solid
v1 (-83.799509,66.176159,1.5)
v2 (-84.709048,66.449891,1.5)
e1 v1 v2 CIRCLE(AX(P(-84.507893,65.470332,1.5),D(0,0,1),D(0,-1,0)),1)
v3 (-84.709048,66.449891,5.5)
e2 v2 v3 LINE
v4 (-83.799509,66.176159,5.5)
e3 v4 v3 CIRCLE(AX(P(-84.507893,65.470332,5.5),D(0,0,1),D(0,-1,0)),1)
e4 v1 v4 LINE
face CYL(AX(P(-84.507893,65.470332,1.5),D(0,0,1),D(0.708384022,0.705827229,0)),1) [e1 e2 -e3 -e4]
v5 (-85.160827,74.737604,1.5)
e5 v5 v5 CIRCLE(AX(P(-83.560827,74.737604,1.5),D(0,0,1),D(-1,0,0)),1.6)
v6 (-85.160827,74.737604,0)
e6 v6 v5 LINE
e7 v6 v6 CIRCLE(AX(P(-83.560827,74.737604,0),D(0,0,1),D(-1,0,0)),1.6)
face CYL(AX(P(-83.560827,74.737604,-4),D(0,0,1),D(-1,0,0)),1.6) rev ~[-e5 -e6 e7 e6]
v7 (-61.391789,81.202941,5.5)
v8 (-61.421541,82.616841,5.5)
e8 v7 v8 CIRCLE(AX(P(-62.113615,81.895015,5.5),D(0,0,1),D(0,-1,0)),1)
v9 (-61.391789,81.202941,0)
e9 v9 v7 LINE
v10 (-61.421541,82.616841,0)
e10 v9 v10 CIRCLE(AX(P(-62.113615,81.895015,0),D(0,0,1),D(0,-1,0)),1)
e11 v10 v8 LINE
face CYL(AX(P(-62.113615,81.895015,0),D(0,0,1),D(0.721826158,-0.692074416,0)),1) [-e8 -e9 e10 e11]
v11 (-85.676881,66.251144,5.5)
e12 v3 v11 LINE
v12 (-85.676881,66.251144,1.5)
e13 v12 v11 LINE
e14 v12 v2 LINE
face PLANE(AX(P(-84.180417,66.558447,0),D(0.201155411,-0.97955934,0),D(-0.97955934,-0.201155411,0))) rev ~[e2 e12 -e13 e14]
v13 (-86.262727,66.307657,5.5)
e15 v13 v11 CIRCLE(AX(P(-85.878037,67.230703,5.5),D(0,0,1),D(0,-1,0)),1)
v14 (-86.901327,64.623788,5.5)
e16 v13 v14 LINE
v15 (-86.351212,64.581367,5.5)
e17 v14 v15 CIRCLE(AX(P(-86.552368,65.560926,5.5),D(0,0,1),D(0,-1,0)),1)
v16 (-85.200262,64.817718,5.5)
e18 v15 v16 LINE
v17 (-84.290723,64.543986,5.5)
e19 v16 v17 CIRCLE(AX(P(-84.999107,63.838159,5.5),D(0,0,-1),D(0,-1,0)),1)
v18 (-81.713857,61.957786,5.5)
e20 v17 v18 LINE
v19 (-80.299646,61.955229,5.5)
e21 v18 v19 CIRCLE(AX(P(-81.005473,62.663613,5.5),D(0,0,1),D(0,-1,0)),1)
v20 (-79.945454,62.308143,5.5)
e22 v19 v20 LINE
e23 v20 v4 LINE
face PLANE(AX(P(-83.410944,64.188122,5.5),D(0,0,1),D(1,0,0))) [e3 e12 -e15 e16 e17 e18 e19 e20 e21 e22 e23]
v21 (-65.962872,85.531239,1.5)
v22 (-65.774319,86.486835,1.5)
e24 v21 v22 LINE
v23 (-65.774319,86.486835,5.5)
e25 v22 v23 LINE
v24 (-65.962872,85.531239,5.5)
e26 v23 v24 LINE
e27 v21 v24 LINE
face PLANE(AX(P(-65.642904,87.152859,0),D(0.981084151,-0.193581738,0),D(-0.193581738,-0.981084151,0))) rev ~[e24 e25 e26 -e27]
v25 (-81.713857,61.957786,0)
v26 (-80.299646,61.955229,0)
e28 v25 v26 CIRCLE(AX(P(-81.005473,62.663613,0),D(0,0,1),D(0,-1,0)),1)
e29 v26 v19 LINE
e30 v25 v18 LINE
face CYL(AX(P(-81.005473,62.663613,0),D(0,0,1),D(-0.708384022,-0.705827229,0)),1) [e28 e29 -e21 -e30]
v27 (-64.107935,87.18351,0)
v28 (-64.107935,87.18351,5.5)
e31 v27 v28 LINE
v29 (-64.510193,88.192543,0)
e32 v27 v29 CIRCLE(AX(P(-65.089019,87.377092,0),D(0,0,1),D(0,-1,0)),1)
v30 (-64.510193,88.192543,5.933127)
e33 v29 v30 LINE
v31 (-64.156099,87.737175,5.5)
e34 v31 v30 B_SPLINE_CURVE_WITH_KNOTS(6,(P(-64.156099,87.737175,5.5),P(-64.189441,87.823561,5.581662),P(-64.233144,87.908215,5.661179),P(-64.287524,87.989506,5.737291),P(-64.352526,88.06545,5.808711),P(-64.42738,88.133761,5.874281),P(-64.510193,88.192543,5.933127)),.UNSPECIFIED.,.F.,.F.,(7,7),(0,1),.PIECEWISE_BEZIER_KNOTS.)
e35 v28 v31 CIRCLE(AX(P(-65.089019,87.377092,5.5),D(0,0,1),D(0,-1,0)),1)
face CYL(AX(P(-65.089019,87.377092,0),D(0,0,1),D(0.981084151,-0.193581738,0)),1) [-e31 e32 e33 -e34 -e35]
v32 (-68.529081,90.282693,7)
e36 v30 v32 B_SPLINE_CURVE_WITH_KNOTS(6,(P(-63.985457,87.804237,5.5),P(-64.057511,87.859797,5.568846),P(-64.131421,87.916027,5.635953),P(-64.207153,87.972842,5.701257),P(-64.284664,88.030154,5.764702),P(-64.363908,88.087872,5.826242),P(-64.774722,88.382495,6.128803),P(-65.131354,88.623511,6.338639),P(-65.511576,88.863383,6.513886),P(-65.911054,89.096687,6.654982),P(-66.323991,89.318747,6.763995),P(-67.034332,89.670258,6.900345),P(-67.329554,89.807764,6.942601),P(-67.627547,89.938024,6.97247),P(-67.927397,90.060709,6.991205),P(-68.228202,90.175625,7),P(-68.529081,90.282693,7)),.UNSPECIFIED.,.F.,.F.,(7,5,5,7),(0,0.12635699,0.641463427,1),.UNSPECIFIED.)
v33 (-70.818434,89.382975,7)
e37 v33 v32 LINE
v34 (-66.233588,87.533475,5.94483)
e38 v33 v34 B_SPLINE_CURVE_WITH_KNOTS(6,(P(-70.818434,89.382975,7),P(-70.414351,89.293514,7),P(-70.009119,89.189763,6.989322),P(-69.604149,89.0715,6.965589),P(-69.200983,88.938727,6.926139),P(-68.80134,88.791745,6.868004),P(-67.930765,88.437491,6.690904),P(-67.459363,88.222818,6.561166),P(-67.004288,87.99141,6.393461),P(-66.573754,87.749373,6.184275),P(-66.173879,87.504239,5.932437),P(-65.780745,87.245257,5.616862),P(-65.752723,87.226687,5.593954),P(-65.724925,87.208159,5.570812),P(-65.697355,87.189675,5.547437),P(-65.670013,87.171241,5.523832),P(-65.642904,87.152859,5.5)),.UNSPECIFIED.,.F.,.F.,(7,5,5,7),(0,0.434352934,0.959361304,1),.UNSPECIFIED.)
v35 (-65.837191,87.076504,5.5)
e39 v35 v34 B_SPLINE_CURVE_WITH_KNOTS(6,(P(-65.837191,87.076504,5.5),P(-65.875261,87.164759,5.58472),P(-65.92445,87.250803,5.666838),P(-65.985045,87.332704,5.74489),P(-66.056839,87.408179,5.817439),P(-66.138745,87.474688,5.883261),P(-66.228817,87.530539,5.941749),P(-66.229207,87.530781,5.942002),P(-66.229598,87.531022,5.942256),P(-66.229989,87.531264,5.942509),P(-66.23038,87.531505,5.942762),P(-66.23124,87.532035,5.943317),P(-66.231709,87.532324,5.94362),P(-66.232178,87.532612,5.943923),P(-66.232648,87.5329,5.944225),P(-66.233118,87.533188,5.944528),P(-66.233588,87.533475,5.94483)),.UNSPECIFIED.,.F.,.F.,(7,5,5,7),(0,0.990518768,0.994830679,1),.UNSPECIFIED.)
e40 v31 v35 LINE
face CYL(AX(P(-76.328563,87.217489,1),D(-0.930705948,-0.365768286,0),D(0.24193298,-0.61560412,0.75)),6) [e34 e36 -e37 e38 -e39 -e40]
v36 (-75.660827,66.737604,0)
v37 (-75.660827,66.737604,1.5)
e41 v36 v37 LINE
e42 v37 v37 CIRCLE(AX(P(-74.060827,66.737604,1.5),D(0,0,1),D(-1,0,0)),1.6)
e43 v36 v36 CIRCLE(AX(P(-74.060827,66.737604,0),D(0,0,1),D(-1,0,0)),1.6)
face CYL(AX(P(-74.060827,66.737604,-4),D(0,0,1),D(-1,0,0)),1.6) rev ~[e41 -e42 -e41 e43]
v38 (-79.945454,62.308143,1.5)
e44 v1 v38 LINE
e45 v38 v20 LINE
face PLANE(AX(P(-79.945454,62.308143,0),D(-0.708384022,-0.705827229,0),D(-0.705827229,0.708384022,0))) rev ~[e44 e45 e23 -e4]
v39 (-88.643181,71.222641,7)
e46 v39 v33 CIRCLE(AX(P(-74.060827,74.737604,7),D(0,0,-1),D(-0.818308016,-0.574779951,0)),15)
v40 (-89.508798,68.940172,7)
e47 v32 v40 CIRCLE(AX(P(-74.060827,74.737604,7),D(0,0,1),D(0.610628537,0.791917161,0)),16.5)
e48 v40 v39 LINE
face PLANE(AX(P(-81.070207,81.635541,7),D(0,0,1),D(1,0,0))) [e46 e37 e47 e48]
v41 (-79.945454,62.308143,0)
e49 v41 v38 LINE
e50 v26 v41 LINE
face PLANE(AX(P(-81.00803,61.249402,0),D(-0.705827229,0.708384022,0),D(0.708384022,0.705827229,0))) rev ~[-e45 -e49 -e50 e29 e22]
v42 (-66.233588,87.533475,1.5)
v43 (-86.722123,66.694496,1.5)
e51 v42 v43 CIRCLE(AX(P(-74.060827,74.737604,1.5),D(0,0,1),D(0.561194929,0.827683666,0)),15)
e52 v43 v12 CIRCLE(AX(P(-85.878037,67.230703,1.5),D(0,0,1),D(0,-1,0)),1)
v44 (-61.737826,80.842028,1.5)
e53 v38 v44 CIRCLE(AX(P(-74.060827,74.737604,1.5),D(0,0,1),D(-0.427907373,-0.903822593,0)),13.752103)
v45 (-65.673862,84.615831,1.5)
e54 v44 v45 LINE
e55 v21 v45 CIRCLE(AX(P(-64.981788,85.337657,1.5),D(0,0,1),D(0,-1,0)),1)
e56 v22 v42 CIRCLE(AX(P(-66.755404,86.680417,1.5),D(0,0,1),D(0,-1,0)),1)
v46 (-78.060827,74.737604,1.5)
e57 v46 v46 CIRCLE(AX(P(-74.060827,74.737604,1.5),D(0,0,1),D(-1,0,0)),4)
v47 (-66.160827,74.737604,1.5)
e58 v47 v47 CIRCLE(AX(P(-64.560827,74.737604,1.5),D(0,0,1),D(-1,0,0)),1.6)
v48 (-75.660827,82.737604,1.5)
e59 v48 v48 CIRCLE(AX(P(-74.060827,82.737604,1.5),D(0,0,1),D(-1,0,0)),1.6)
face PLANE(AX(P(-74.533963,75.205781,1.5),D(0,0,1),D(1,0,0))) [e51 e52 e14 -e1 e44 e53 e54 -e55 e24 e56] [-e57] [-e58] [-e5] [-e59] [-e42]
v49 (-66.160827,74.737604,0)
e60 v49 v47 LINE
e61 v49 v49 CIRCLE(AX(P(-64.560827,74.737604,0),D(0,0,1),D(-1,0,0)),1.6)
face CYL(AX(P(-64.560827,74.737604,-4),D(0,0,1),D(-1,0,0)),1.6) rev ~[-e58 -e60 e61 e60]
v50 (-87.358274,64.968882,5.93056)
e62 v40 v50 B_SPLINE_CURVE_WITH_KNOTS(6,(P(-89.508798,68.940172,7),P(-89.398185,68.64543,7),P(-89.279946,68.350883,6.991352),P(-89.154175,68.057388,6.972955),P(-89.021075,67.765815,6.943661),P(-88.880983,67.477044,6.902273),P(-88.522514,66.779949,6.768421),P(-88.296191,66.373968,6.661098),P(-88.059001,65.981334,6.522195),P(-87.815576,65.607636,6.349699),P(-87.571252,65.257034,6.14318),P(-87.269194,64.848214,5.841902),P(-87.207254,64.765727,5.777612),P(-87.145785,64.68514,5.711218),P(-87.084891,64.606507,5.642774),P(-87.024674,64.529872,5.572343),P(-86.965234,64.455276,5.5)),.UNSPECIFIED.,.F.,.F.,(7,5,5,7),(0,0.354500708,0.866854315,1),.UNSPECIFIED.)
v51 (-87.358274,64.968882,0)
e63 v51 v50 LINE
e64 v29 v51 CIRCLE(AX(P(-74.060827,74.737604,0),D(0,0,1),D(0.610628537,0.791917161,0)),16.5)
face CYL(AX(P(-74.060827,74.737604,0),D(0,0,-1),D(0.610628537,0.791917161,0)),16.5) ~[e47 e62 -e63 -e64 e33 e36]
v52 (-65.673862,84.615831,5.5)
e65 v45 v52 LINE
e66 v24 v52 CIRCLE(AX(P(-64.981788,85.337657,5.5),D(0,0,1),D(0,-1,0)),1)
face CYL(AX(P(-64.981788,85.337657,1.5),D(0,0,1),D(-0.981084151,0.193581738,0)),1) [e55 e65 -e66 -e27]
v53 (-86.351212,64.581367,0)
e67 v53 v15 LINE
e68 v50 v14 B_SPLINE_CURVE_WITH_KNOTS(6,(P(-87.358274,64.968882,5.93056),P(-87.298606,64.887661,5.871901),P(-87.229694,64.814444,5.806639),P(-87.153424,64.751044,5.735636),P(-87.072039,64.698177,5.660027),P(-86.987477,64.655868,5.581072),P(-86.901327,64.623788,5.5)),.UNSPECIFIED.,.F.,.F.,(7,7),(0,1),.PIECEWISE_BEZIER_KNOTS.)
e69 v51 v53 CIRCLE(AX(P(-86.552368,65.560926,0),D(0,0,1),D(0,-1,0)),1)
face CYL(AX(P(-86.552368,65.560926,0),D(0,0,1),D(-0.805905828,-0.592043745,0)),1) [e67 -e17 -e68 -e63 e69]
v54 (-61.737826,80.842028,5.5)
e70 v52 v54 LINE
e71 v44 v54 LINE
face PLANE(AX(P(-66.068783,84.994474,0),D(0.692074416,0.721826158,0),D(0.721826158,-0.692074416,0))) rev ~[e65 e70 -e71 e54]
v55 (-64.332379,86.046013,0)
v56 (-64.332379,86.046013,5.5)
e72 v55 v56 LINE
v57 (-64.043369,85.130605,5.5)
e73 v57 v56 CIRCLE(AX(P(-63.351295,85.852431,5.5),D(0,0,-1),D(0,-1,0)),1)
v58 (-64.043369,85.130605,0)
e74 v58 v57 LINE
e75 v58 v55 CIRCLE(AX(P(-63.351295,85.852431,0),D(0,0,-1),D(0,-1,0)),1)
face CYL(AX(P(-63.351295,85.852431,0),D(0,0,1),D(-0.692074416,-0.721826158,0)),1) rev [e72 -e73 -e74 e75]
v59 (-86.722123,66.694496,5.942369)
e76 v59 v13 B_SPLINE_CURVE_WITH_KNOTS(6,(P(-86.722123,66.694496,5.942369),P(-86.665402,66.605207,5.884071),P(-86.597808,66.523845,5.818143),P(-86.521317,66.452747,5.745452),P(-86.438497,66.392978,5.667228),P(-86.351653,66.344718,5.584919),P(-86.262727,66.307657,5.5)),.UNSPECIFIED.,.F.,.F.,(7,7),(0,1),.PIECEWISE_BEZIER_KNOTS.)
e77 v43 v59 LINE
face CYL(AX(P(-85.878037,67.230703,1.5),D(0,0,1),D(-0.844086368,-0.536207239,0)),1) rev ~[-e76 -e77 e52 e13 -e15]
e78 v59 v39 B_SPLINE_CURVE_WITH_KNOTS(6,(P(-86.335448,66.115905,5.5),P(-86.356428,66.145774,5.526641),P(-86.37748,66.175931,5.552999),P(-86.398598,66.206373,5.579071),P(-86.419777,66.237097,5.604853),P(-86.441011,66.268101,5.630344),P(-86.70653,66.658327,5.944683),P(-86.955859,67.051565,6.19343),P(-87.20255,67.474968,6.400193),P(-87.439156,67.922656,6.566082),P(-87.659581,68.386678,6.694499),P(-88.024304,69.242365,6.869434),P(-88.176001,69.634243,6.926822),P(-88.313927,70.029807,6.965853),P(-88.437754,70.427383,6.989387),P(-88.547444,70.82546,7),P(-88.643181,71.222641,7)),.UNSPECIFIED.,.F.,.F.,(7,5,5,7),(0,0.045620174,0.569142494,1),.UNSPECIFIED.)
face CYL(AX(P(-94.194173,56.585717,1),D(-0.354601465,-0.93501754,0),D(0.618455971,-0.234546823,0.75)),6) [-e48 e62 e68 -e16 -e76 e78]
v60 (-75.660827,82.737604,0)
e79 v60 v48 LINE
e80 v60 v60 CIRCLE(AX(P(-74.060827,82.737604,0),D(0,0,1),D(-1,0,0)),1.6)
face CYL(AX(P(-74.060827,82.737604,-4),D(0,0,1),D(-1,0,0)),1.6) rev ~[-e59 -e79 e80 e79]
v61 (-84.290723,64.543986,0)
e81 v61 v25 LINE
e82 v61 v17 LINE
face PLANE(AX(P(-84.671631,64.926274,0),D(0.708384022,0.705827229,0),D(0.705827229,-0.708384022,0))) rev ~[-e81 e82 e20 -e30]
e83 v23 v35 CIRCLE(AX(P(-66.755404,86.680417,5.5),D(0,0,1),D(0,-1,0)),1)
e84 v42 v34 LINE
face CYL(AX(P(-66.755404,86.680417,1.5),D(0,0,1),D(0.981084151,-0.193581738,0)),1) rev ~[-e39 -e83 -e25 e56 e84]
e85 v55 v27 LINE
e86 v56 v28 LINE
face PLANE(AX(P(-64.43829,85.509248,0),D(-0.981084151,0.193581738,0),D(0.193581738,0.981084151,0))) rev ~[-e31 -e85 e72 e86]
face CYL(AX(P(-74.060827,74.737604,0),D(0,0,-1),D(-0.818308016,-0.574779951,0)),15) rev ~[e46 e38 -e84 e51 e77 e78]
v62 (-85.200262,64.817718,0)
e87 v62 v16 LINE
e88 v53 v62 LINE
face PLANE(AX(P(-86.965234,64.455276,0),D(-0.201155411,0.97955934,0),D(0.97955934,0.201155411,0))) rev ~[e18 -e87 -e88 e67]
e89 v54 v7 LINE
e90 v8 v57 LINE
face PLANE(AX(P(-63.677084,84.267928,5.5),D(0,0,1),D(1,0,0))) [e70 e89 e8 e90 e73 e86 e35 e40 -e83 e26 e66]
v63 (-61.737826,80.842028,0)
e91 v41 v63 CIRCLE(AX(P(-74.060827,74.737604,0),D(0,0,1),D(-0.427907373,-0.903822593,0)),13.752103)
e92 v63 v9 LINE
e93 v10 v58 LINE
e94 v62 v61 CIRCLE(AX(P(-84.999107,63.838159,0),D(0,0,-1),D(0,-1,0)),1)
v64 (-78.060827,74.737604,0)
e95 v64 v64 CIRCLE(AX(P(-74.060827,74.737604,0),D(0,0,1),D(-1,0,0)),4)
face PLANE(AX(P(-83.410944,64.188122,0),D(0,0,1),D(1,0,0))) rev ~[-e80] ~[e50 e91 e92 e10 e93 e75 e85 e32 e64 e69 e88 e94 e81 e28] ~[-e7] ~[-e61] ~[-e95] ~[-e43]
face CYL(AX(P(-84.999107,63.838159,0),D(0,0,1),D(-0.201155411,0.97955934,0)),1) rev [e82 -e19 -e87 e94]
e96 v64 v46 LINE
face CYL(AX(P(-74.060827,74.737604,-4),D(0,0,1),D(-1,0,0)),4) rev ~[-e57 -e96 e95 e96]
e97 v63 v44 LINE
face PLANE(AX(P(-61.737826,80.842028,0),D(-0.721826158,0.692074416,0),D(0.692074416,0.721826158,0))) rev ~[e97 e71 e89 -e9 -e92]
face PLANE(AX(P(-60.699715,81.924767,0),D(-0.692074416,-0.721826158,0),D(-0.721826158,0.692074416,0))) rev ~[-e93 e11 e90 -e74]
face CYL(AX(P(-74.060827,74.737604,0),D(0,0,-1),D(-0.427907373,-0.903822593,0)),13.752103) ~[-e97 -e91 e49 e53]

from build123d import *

# Parameters (mm, degrees)
F1_DEPTH    = 1.5
F2_DEPTH    = 5.5
F3_DEPTH    = 7
F4_T1_DEPTH = 21.6191756982
F4_T3_DEPTH = 21.6239840214
F5_R        = 1
F6_D        = 3.2
F6_DEPTH    = 4
F6_TIP      = 0.9613769904
F7_D        = 8
F7_DEPTH    = 4
F7_TIP      = 2.4034424761


# Not quite as in the source:
# - a fillet or chamfer that OpenCascade refuses, or shapes differently, is made with other operations: its cross-section is extruded or revolved along the edge and cut away or added


with BuildPart() as f1:
    # F0 (on Top) → F1 (new body)
    with BuildSketch(Plane.XY):
        with BuildLine():
            Line((-66.0687833834, 84.994474126), (-65.6429035596, 87.1528592574))
            ThreePointArc((-65.6429035596, 87.1528592574), (-84.7546054832, 85.2563072371), (-86.3354477268, 66.1159050004))
            Line((-86.3354477268, 66.1159050004), (-84.1804171789, 66.558446905))
            Line((-84.1804171789, 66.558446905), (-79.945453805, 62.3081427722))
            ThreePointArc((-79.945453805, 62.3081427722), (-64.2506598446, 65.1001279098), (-61.7378264361, 80.8420276277))
            Line((-61.7378264361, 80.8420276277), (-66.0687833834, 84.994474126))
        make_face()
    extrude(amount=F1_DEPTH)

    # F0 (on Top) → F2 (join)
    with BuildSketch(Plane.XY):
        Polygon((-84.1804171789, 66.558446905), (-86.3354477268, 66.1159050004), (-86.9652344199, 64.4552756389), (-84.6716307932, 64.9262739357), (-81.0080298382, 61.2494019287), (-79.945453805, 62.3081427722), align=None)
        Polygon((-63.9854566278, 87.8042374119), (-65.6429035596, 87.1528592574), (-66.0687833834, 84.994474126), (-61.7378264361, 80.8420276277), (-60.6997148116, 81.9247668645), (-64.4382903395, 85.5092483194), align=None)
    extrude(amount=F2_DEPTH)

    # F0 (on Top) → F3 (join)
    with BuildSketch(Plane.XY):
        with BuildLine():
            ThreePointArc((-86.3354477268, 66.1159050004), (-84.7546054832, 85.2563072371), (-65.6429035596, 87.1528592574))
            Line((-65.6429035596, 87.1528592574), (-63.9854566278, 87.8042374119))
            ThreePointArc((-63.9854566278, 87.8042374119), (-85.82068996, 86.3115247186), (-86.9652344199, 64.4552756389))
            Line((-86.9652344199, 64.4552756389), (-86.3354477268, 66.1159050004))
        make_face()
    extrude(amount=F3_DEPTH)

    # F4: fillet of radius 6 on 2 edges, made by hand

    # F4_s2 → F4_t1 (cut)
    with BuildSketch(Plane(origin=(6.9172981305, 18.2396174816, 0), x_dir=(0, 0, 1), z_dir=(0.3546014652, 0.9350175404, 0))):
        with BuildLine():
            ThreePointArc((5.5, -104.169954771), (6.6124860802, -106.0172613941), (7, -108.1385817376))
            Line((7, -108.1385817376), (7, -104.169954771))
            Line((7, -104.169954771), (5.5, -104.169954771))
        make_face()
    extrude(amount=F4_T1_DEPTH, mode=Mode.SUBTRACT)

    # F4_s4 → F4_t3 (cut)
    with BuildSketch(Plane(origin=(-36.4260217608, -14.315459745, 0), x_dir=(0, 0, 1), z_dir=(0.9307059478, 0.3657682856, 0))):
        with BuildLine():
            ThreePointArc((5.5, -105.123776774), (6.6124860802, -106.971083397), (7, -109.0924037406))
            Line((7, -109.0924037406), (7, -105.123776774))
            Line((7, -105.123776774), (5.5, -105.123776774))
        make_face()
    extrude(amount=F4_T3_DEPTH, mode=Mode.SUBTRACT)

    # F5 (call 1 of 10: OpenCascade refuses the feature's edges together)
    f5_edges = [f1.edges().sort_by_distance(p)[0] for p in [
        (-86.965234, 64.455276, 2.75),
    ]]
    fillet(f5_edges, radius=F5_R)

    # F5#2 (call 2 of 10)
    f5_2_edges = [f1.edges().sort_by_distance(p)[0] for p in [
        (-84.671631, 64.926274, 2.75),
    ]]
    fillet(f5_2_edges, radius=F5_R)

    # F5#3 (call 3 of 10)
    f5_3_edges = [f1.edges().sort_by_distance(p)[0] for p in [
        (-81.00803, 61.249402, 2.75),
    ]]
    fillet(f5_3_edges, radius=F5_R)

    # F5#4 (call 4 of 10)
    f5_4_edges = [f1.edges().sort_by_distance(p)[0] for p in [
        (-60.699715, 81.924767, 2.75),
    ]]
    fillet(f5_4_edges, radius=F5_R)

    # F5#5 (call 5 of 10)
    f5_5_edges = [f1.edges().sort_by_distance(p)[0] for p in [
        (-64.43829, 85.509248, 2.75),
    ]]
    fillet(f5_5_edges, radius=F5_R)

    # F5#6 (call 6 of 10)
    f5_6_edges = [f1.edges().sort_by_distance(p)[0] for p in [
        (-63.985457, 87.804237, 2.75),
    ]]
    fillet(f5_6_edges, radius=F5_R)

    # F5#7 (call 7 of 10)
    f5_7_edges = [f1.edges().sort_by_distance(p)[0] for p in [
        (-84.180417, 66.558447, 3.5),
    ]]
    fillet(f5_7_edges, radius=F5_R)

    # F5#8 (call 8 of 10)
    f5_8_edges = [f1.edges().sort_by_distance(p)[0] for p in [
        (-66.068783, 84.994474, 3.5),
    ]]
    fillet(f5_8_edges, radius=F5_R)

    # F5#9 (call 9 of 10)
    f5_9_edges = [f1.edges().sort_by_distance(p)[0] for p in [
        (-65.642904, 87.152859, 3.5),
    ]]
    fillet(f5_9_edges, radius=F5_R)

    # F5#10 (call 10 of 10)
    f5_10_edges = [f1.edges().sort_by_distance(p)[0] for p in [
        (-86.335448, 66.115905, 3.5),
    ]]
    fillet(f5_10_edges, radius=F5_R)

    # F6
    with Locations(Plane(origin=(0, 0, 0), x_dir=(1, 0, 0), z_dir=(0, 0, -1))):
        with Locations((-83.5608274937, -74.7376042604), (-74.0608274937, -82.7376042604), (-64.5608274937, -74.7376042604), (-74.0608274937, -66.7376042604)):
            Hole(F6_D / 2, depth=F6_DEPTH)
            with Locations((0, 0, -(F6_DEPTH + F6_TIP / 2))):  # 118° drill point
                Cone(0, F6_D / 2, F6_TIP, mode=Mode.SUBTRACT)

    # F7
    with Locations(Plane(origin=(0, 0, 0), x_dir=(1, 0, 0), z_dir=(0, 0, -1))):
        with Locations((-74.0608274937, -74.7376042604)):
            Hole(F7_D / 2, depth=F7_DEPTH)
            with Locations((0, 0, -(F7_DEPTH + F7_TIP / 2))):  # 118° drill point
                Cone(0, F7_D / 2, F7_TIP, mode=Mode.SUBTRACT)


solid = f1.part
